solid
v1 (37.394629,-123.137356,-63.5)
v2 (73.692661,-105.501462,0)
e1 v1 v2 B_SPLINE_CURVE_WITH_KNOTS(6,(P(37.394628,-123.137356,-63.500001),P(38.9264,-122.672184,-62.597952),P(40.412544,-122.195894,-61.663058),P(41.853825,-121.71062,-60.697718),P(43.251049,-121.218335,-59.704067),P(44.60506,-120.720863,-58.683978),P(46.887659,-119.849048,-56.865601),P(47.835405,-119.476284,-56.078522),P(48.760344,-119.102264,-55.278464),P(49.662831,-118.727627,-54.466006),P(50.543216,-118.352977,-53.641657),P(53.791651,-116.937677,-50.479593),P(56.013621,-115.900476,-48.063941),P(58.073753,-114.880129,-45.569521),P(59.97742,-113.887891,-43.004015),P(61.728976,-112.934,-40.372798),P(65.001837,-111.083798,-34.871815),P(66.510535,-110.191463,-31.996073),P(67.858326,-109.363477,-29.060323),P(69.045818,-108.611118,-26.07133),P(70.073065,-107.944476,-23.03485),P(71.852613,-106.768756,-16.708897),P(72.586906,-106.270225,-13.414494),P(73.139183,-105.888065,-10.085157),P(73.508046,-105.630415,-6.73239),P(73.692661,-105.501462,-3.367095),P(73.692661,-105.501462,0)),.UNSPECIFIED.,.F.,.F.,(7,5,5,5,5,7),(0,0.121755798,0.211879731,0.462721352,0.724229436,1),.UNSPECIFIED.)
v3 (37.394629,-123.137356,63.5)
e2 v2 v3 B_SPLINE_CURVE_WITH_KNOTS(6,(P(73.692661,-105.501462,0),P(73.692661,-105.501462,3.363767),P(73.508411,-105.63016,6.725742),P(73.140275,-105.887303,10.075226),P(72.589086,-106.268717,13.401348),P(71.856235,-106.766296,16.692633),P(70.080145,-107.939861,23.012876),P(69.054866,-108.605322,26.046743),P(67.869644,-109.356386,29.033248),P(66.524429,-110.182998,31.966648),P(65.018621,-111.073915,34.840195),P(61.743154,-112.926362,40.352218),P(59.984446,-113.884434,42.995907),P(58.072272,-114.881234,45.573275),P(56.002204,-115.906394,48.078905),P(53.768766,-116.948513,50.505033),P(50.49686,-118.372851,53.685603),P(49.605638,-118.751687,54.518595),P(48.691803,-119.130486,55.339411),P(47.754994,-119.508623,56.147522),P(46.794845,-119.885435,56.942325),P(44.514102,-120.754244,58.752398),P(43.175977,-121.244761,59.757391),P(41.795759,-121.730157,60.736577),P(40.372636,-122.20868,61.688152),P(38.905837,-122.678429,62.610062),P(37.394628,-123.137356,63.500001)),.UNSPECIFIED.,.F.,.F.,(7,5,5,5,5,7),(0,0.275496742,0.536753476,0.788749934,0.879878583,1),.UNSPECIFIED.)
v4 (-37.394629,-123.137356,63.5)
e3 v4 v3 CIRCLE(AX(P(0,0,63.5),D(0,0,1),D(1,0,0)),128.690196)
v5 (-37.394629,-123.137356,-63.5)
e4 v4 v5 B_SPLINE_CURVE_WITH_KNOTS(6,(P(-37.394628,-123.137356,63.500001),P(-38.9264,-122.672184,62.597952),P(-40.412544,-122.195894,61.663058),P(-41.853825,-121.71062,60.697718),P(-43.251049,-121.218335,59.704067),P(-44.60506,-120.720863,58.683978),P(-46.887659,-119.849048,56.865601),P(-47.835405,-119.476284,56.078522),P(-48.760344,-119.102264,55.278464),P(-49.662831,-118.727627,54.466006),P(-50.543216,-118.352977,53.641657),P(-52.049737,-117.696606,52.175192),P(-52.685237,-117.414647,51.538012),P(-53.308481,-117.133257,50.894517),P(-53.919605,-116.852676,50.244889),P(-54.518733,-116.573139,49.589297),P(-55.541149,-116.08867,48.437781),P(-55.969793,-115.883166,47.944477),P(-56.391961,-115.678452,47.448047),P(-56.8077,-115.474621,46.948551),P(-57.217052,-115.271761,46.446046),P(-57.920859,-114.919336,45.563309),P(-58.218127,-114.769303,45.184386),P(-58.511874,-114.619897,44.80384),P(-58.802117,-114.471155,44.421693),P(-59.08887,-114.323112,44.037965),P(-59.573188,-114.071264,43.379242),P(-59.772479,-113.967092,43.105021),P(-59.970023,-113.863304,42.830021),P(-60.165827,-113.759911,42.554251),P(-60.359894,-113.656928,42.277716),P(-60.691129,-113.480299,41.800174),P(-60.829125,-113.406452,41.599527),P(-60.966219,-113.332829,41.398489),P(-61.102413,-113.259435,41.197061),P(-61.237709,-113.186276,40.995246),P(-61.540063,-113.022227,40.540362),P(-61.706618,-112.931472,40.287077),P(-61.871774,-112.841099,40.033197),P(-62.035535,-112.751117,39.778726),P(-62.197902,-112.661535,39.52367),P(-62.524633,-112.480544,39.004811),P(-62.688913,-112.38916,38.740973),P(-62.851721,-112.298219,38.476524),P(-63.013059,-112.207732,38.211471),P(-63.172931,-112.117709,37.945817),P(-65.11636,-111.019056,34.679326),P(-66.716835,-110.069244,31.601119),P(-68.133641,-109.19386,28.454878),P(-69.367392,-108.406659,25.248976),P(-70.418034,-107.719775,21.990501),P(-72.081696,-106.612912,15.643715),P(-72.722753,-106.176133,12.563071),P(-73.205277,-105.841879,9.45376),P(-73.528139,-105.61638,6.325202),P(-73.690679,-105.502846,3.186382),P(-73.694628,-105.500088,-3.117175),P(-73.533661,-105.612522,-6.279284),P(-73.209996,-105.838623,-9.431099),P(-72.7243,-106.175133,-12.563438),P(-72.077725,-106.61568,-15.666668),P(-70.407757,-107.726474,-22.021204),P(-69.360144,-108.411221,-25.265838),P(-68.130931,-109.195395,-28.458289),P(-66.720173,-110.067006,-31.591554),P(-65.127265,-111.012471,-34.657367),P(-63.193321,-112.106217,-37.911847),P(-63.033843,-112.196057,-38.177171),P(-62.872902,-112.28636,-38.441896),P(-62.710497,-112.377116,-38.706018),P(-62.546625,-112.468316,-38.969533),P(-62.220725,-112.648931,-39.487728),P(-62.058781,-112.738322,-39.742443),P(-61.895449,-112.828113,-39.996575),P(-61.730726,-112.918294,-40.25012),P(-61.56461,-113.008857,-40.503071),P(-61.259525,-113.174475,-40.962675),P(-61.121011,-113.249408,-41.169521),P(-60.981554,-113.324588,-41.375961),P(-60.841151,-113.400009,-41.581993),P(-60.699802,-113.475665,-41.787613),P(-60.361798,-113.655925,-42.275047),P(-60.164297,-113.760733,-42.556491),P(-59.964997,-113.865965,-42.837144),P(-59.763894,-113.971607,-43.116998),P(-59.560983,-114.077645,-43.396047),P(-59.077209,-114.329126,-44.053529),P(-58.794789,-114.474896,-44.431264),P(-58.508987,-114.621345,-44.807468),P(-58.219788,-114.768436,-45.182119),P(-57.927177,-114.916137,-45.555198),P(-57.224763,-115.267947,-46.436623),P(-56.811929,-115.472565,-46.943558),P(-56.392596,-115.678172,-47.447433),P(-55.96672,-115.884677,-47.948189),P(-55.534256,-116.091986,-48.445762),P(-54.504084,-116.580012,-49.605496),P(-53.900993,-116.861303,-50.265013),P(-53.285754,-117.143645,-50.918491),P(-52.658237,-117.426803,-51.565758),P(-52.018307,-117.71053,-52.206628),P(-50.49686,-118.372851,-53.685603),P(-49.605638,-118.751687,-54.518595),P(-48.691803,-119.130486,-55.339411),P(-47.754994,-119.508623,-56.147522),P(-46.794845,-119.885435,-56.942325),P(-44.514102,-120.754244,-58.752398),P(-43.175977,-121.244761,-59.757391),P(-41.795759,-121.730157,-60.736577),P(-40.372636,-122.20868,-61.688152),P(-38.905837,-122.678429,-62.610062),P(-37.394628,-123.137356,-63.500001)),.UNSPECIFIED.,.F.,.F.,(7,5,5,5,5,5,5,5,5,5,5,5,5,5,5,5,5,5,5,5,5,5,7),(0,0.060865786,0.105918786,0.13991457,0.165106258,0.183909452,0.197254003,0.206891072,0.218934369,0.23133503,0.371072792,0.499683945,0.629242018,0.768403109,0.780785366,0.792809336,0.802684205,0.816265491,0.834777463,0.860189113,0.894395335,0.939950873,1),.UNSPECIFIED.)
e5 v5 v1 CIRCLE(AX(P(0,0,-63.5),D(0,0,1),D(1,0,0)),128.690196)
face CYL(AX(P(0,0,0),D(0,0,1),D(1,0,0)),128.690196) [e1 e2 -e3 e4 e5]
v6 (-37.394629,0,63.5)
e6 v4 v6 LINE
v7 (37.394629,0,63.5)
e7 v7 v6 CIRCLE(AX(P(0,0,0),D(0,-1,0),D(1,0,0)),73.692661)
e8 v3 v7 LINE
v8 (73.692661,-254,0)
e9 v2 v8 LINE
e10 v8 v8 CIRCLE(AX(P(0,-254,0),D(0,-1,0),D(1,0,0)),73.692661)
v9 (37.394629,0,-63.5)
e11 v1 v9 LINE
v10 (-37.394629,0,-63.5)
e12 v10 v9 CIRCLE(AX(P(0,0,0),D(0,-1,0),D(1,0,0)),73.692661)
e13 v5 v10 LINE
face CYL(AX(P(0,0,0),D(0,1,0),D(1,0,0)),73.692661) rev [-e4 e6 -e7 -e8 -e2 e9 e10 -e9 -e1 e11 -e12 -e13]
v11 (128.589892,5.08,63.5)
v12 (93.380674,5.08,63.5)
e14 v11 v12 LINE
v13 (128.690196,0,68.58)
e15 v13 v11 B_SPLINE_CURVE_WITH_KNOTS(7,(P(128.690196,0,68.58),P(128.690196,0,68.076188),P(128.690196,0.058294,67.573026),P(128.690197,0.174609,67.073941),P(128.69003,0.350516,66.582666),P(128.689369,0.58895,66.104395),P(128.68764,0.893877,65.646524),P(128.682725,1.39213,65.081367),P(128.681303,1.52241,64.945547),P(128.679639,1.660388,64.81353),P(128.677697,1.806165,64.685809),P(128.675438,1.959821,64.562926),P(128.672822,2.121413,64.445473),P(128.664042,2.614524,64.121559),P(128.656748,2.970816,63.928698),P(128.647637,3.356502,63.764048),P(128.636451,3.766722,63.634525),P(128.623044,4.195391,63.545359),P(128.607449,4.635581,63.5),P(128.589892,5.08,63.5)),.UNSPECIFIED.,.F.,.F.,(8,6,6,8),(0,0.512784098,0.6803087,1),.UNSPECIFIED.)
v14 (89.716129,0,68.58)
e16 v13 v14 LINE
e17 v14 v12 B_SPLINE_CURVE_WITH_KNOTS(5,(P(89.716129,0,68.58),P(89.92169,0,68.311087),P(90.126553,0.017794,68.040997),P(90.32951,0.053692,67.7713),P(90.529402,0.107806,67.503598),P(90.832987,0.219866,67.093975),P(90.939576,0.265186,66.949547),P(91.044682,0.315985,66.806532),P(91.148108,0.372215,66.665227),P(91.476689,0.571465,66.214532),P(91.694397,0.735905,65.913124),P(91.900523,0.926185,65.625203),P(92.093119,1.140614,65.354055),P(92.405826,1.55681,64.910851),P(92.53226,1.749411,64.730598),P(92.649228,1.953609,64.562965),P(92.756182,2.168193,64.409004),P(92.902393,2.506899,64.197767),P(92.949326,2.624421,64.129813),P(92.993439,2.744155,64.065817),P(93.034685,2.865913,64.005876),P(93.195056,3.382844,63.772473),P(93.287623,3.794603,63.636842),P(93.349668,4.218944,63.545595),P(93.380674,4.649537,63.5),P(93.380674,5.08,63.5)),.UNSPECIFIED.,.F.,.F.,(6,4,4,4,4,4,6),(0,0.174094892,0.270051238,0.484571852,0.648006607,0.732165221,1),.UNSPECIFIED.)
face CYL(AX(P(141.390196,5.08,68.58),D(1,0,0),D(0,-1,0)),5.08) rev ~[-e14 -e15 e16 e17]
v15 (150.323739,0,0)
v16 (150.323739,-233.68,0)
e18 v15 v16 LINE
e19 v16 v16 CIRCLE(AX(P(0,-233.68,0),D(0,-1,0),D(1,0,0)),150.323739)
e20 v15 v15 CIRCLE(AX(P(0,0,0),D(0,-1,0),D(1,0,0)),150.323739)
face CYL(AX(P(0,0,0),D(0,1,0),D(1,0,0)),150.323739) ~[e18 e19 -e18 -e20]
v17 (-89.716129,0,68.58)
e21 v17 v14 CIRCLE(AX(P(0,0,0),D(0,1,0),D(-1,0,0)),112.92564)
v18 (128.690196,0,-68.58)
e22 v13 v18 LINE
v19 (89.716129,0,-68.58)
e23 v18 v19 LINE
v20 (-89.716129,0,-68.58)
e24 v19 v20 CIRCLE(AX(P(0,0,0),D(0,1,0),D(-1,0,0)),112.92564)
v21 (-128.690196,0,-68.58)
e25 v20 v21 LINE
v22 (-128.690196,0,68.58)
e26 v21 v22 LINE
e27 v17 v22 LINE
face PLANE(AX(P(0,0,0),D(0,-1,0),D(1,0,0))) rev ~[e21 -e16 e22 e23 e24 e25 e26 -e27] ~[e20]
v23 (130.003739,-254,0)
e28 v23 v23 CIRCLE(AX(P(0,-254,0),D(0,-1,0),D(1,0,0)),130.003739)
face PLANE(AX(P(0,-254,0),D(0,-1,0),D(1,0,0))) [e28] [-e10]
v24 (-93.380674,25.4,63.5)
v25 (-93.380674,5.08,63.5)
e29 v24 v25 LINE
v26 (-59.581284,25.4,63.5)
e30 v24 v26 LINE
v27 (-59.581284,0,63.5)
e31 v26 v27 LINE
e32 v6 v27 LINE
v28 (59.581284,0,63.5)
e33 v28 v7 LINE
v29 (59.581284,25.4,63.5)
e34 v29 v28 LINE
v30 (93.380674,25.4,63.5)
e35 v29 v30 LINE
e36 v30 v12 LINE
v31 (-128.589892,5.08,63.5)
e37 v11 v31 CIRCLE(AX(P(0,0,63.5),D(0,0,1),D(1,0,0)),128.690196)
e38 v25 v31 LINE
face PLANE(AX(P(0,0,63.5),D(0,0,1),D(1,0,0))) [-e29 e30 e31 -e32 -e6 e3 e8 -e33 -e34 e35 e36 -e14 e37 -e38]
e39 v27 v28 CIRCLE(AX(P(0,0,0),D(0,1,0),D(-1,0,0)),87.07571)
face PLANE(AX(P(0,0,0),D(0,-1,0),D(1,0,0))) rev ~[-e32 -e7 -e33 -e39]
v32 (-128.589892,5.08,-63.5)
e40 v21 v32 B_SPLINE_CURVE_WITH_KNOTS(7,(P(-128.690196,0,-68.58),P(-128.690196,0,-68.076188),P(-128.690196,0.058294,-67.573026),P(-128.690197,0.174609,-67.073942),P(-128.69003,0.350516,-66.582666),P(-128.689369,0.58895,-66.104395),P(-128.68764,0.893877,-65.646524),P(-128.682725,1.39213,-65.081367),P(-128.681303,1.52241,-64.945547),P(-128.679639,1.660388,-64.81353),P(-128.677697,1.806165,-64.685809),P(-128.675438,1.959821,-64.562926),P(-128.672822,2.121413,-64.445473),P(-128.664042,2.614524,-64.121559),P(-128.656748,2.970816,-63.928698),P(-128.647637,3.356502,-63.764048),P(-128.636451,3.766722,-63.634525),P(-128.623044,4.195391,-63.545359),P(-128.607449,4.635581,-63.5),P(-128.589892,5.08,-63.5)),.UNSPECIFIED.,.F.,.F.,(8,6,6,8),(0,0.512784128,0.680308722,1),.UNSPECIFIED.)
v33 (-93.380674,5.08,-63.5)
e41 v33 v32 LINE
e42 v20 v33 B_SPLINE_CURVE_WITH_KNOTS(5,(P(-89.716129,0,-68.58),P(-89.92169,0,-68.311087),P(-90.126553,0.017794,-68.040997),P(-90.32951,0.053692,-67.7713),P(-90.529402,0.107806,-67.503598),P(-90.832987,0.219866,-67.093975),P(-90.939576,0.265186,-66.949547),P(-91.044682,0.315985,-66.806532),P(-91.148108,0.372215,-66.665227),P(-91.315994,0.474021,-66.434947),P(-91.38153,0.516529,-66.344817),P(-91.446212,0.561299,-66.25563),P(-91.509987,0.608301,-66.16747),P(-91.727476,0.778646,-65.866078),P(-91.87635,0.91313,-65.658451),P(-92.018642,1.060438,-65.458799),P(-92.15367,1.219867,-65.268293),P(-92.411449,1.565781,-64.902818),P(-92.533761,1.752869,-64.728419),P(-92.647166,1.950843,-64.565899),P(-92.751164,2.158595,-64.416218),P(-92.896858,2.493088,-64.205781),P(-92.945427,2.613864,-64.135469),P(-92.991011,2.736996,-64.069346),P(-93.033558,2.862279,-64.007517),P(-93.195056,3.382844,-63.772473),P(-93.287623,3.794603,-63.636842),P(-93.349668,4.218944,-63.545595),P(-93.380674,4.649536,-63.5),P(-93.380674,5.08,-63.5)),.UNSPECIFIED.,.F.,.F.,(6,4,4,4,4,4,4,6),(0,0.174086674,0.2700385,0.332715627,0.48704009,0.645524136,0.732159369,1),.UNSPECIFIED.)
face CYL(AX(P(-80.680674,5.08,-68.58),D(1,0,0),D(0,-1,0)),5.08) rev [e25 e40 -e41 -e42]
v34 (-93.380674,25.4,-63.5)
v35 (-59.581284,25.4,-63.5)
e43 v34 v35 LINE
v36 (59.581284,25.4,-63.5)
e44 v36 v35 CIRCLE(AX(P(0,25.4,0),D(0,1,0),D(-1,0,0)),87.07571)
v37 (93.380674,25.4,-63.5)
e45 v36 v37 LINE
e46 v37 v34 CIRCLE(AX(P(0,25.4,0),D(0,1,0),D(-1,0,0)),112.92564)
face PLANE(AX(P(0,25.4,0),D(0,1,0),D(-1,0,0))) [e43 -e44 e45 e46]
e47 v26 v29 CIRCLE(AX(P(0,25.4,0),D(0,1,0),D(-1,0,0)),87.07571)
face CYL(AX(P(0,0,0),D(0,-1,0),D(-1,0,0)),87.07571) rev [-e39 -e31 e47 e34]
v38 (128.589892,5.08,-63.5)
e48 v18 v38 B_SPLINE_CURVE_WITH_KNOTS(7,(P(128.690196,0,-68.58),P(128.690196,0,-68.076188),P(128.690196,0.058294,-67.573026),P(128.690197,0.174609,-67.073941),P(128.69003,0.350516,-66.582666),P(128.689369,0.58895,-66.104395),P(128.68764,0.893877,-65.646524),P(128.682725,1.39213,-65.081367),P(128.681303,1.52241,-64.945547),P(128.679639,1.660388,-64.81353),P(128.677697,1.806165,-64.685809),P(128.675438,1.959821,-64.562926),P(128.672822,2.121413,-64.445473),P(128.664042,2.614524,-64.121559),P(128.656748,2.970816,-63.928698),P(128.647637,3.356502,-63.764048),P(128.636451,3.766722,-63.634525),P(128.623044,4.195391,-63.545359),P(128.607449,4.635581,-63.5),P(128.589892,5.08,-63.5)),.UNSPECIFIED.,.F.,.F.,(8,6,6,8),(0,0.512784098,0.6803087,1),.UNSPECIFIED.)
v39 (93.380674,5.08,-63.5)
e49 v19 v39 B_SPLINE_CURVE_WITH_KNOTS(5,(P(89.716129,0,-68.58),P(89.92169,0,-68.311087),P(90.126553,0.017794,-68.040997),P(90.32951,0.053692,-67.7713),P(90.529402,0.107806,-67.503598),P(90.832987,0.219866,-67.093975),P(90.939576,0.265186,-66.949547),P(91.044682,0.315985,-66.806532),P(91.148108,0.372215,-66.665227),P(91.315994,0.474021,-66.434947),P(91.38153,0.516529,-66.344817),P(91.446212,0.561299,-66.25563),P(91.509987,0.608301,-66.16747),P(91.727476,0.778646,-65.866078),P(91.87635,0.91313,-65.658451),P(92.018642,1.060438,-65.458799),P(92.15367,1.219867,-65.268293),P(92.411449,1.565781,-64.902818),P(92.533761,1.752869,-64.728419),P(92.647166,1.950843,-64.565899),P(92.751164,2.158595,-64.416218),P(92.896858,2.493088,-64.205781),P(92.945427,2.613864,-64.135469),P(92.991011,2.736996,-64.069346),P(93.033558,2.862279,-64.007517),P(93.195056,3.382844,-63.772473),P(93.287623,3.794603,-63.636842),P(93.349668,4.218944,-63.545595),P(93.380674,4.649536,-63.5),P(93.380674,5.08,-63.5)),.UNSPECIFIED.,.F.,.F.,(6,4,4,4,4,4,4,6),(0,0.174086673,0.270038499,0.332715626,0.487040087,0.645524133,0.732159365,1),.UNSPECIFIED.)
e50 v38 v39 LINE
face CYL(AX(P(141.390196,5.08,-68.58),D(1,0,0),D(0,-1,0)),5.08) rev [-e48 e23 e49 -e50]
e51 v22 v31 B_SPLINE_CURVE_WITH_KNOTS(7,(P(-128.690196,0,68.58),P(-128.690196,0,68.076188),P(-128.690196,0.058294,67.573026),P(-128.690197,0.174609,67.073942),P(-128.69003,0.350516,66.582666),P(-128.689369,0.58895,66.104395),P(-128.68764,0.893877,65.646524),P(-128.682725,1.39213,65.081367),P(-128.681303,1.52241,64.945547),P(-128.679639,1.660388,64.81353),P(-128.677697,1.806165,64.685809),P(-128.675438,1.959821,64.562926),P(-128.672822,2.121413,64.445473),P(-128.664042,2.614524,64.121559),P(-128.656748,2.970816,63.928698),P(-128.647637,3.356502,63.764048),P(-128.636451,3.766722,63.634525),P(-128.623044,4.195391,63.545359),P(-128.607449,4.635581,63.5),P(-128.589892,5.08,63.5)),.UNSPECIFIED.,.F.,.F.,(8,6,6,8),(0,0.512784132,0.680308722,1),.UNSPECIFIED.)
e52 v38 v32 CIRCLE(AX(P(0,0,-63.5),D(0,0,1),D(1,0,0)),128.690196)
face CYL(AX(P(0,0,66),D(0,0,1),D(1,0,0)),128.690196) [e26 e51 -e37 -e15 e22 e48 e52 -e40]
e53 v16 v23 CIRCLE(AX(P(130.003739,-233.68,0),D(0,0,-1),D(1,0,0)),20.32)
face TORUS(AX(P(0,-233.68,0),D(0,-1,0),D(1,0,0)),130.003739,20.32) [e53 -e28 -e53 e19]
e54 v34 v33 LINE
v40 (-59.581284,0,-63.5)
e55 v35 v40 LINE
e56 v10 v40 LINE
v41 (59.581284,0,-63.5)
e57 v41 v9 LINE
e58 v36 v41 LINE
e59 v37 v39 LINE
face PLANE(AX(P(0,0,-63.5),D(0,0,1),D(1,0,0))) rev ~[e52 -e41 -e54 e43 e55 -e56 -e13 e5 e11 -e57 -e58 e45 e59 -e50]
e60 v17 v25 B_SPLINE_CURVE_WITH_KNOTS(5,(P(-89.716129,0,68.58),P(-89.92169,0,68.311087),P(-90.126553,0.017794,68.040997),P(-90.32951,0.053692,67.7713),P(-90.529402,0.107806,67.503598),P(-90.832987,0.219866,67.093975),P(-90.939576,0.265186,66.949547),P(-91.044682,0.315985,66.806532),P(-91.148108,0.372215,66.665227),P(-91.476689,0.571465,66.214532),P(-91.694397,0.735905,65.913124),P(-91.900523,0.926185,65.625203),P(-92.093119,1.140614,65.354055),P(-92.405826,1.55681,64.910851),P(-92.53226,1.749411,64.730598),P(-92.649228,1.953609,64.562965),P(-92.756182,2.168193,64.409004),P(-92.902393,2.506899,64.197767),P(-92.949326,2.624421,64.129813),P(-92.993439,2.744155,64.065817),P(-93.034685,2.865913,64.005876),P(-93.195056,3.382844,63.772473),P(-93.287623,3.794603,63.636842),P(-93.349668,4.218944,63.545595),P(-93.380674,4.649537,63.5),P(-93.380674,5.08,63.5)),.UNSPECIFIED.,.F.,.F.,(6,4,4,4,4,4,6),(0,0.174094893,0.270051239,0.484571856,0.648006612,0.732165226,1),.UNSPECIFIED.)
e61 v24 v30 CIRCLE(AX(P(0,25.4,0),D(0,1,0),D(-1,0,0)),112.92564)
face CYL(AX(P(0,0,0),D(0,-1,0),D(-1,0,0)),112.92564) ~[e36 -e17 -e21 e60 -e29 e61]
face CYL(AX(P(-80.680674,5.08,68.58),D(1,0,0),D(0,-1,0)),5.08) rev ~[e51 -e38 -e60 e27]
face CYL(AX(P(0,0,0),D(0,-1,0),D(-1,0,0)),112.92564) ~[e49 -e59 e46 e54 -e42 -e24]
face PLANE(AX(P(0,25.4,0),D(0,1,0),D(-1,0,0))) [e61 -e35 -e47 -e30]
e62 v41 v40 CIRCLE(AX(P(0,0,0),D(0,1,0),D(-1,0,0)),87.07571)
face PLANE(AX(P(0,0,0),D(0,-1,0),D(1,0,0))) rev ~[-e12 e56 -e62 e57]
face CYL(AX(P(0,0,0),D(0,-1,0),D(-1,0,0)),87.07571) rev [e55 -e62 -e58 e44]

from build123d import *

# Parameters (mm, degrees)
F0_R         = 150.3237387913
F0_R_2       = 73.6926609148
F1_DEPTH     = 254
F2_R         = 20.32
F3_R         = 112.9256404591
F3_R_2       = 87.0757104376
F4_DEPTH     = 25.4
F5_R         = 128.6901964601
F6_DEPTH     = 63.5
F7_T4_DEPTH  = 60.7095224794
F7_S5_R      = 128.6901964601
F7_T6_DEPTH  = 32
F7_T10_DEPTH = 60.7095224794
F7_S11_R     = 128.6901964601
F7_T12_DEPTH = 32
F7_T16_DEPTH = 60.7095224794
F7_S17_R     = 128.6901964601
F7_T18_DEPTH = 32
F7_T22_DEPTH = 60.7095224794
F7_S23_R     = 128.6901964601
F7_T24_DEPTH = 32


# Not quite as in the source:
# - a fillet or chamfer that OpenCascade refuses, or shapes differently, is made with other operations: its cross-section is extruded or revolved along the edge and cut away or added


with BuildPart() as f1:
    # F0 (on Front) → F1 (new body)
    with BuildSketch(Plane.XZ):
        Circle(F0_R)
        Circle(F0_R_2, mode=Mode.SUBTRACT)
    extrude(amount=F1_DEPTH)

    # F2
    f2_edges = [f1.edges().sort_by_distance(p)[0] for p in [
        (-150.323739, -254, 0),
    ]]
    fillet(f2_edges, radius=F2_R)

    # F3 (on face) → F4 (join)
    with BuildSketch(Plane(origin=(0, 0, 0), x_dir=(-1, 0, 0), z_dir=(0, 1, 0))):
        Circle(F3_R)
        Circle(F3_R_2, mode=Mode.SUBTRACT)
    extrude(amount=F4_DEPTH)

    # F5 (on Top) → F6 (join, symmetric)
    with BuildSketch(Plane.XY):
        Circle(F5_R)
    extrude(amount=F6_DEPTH, both=True)

    # F7: fillet of radius 5.08 on 4 edges, made by hand


with BuildPart() as f7_tool2:
    # F7_s3 → F7_t4 (new body)
    with BuildSketch(Plane.YZ.offset(-80.6806739807)):
        with BuildLine():
            ThreePointArc((0, -68.58), (1.4878975516, -64.9878975516), (5.08, -63.5))
            Line((5.08, -63.5), (0, -63.5))
            Line((0, -63.5), (0, -68.58))
        make_face()
    extrude(amount=-F7_T4_DEPTH)

    # F7_s5 → F7_t6 (intersect, symmetric)
    with BuildSketch(Plane.XY.offset(-66)):
        Circle(F7_S5_R)
    extrude(amount=F7_T6_DEPTH, both=True, mode=Mode.INTERSECT)


with BuildPart() as f1_1:
    add(f1.part)

    # F7_t1: union F7_tool2
    add(f7_tool2.part)


with BuildPart() as f7_tool8:
    # F7_s9 → F7_t10 (new body)
    with BuildSketch(Plane.YZ.offset(141.3901964601)):
        with BuildLine():
            ThreePointArc((0, -68.58), (1.4878975516, -64.9878975516), (5.08, -63.5))
            Line((5.08, -63.5), (0, -63.5))
            Line((0, -63.5), (0, -68.58))
        make_face()
    extrude(amount=-F7_T10_DEPTH)

    # F7_s11 → F7_t12 (intersect, symmetric)
    with BuildSketch(Plane.XY.offset(-66)):
        Circle(F7_S11_R)
    extrude(amount=F7_T12_DEPTH, both=True, mode=Mode.INTERSECT)


with BuildPart() as f1_2:
    add(f1_1.part)

    # F7_t7: union F7_tool8
    add(f7_tool8.part)


with BuildPart() as f7_tool14:
    # F7_s15 → F7_t16 (new body)
    with BuildSketch(Plane.YZ.offset(-80.6806739807)):
        with BuildLine():
            ThreePointArc((0, 68.58), (1.4878975516, 64.9878975516), (5.08, 63.5))
            Line((5.08, 63.5), (0, 63.5))
            Line((0, 63.5), (0, 68.58))
        make_face()
    extrude(amount=-F7_T16_DEPTH)

    # F7_s17 → F7_t18 (intersect, symmetric)
    with BuildSketch(Plane.XY.offset(66)):
        Circle(F7_S17_R)
    extrude(amount=F7_T18_DEPTH, both=True, mode=Mode.INTERSECT)


with BuildPart() as f1_3:
    add(f1_2.part)

    # F7_t13: union F7_tool14
    add(f7_tool14.part)


with BuildPart() as f7_tool20:
    # F7_s21 → F7_t22 (new body)
    with BuildSketch(Plane.YZ.offset(141.3901964601)):
        with BuildLine():
            ThreePointArc((0, 68.58), (1.4878975516, 64.9878975516), (5.08, 63.5))
            Line((5.08, 63.5), (0, 63.5))
            Line((0, 63.5), (0, 68.58))
        make_face()
    extrude(amount=-F7_T22_DEPTH)

    # F7_s23 → F7_t24 (intersect, symmetric)
    with BuildSketch(Plane.XY.offset(66)):
        Circle(F7_S23_R)
    extrude(amount=F7_T24_DEPTH, both=True, mode=Mode.INTERSECT)


with BuildPart() as f1_4:
    add(f1_3.part)

    # F7_t19: union F7_tool20
    add(f7_tool20.part)


solid = f1_4.part
